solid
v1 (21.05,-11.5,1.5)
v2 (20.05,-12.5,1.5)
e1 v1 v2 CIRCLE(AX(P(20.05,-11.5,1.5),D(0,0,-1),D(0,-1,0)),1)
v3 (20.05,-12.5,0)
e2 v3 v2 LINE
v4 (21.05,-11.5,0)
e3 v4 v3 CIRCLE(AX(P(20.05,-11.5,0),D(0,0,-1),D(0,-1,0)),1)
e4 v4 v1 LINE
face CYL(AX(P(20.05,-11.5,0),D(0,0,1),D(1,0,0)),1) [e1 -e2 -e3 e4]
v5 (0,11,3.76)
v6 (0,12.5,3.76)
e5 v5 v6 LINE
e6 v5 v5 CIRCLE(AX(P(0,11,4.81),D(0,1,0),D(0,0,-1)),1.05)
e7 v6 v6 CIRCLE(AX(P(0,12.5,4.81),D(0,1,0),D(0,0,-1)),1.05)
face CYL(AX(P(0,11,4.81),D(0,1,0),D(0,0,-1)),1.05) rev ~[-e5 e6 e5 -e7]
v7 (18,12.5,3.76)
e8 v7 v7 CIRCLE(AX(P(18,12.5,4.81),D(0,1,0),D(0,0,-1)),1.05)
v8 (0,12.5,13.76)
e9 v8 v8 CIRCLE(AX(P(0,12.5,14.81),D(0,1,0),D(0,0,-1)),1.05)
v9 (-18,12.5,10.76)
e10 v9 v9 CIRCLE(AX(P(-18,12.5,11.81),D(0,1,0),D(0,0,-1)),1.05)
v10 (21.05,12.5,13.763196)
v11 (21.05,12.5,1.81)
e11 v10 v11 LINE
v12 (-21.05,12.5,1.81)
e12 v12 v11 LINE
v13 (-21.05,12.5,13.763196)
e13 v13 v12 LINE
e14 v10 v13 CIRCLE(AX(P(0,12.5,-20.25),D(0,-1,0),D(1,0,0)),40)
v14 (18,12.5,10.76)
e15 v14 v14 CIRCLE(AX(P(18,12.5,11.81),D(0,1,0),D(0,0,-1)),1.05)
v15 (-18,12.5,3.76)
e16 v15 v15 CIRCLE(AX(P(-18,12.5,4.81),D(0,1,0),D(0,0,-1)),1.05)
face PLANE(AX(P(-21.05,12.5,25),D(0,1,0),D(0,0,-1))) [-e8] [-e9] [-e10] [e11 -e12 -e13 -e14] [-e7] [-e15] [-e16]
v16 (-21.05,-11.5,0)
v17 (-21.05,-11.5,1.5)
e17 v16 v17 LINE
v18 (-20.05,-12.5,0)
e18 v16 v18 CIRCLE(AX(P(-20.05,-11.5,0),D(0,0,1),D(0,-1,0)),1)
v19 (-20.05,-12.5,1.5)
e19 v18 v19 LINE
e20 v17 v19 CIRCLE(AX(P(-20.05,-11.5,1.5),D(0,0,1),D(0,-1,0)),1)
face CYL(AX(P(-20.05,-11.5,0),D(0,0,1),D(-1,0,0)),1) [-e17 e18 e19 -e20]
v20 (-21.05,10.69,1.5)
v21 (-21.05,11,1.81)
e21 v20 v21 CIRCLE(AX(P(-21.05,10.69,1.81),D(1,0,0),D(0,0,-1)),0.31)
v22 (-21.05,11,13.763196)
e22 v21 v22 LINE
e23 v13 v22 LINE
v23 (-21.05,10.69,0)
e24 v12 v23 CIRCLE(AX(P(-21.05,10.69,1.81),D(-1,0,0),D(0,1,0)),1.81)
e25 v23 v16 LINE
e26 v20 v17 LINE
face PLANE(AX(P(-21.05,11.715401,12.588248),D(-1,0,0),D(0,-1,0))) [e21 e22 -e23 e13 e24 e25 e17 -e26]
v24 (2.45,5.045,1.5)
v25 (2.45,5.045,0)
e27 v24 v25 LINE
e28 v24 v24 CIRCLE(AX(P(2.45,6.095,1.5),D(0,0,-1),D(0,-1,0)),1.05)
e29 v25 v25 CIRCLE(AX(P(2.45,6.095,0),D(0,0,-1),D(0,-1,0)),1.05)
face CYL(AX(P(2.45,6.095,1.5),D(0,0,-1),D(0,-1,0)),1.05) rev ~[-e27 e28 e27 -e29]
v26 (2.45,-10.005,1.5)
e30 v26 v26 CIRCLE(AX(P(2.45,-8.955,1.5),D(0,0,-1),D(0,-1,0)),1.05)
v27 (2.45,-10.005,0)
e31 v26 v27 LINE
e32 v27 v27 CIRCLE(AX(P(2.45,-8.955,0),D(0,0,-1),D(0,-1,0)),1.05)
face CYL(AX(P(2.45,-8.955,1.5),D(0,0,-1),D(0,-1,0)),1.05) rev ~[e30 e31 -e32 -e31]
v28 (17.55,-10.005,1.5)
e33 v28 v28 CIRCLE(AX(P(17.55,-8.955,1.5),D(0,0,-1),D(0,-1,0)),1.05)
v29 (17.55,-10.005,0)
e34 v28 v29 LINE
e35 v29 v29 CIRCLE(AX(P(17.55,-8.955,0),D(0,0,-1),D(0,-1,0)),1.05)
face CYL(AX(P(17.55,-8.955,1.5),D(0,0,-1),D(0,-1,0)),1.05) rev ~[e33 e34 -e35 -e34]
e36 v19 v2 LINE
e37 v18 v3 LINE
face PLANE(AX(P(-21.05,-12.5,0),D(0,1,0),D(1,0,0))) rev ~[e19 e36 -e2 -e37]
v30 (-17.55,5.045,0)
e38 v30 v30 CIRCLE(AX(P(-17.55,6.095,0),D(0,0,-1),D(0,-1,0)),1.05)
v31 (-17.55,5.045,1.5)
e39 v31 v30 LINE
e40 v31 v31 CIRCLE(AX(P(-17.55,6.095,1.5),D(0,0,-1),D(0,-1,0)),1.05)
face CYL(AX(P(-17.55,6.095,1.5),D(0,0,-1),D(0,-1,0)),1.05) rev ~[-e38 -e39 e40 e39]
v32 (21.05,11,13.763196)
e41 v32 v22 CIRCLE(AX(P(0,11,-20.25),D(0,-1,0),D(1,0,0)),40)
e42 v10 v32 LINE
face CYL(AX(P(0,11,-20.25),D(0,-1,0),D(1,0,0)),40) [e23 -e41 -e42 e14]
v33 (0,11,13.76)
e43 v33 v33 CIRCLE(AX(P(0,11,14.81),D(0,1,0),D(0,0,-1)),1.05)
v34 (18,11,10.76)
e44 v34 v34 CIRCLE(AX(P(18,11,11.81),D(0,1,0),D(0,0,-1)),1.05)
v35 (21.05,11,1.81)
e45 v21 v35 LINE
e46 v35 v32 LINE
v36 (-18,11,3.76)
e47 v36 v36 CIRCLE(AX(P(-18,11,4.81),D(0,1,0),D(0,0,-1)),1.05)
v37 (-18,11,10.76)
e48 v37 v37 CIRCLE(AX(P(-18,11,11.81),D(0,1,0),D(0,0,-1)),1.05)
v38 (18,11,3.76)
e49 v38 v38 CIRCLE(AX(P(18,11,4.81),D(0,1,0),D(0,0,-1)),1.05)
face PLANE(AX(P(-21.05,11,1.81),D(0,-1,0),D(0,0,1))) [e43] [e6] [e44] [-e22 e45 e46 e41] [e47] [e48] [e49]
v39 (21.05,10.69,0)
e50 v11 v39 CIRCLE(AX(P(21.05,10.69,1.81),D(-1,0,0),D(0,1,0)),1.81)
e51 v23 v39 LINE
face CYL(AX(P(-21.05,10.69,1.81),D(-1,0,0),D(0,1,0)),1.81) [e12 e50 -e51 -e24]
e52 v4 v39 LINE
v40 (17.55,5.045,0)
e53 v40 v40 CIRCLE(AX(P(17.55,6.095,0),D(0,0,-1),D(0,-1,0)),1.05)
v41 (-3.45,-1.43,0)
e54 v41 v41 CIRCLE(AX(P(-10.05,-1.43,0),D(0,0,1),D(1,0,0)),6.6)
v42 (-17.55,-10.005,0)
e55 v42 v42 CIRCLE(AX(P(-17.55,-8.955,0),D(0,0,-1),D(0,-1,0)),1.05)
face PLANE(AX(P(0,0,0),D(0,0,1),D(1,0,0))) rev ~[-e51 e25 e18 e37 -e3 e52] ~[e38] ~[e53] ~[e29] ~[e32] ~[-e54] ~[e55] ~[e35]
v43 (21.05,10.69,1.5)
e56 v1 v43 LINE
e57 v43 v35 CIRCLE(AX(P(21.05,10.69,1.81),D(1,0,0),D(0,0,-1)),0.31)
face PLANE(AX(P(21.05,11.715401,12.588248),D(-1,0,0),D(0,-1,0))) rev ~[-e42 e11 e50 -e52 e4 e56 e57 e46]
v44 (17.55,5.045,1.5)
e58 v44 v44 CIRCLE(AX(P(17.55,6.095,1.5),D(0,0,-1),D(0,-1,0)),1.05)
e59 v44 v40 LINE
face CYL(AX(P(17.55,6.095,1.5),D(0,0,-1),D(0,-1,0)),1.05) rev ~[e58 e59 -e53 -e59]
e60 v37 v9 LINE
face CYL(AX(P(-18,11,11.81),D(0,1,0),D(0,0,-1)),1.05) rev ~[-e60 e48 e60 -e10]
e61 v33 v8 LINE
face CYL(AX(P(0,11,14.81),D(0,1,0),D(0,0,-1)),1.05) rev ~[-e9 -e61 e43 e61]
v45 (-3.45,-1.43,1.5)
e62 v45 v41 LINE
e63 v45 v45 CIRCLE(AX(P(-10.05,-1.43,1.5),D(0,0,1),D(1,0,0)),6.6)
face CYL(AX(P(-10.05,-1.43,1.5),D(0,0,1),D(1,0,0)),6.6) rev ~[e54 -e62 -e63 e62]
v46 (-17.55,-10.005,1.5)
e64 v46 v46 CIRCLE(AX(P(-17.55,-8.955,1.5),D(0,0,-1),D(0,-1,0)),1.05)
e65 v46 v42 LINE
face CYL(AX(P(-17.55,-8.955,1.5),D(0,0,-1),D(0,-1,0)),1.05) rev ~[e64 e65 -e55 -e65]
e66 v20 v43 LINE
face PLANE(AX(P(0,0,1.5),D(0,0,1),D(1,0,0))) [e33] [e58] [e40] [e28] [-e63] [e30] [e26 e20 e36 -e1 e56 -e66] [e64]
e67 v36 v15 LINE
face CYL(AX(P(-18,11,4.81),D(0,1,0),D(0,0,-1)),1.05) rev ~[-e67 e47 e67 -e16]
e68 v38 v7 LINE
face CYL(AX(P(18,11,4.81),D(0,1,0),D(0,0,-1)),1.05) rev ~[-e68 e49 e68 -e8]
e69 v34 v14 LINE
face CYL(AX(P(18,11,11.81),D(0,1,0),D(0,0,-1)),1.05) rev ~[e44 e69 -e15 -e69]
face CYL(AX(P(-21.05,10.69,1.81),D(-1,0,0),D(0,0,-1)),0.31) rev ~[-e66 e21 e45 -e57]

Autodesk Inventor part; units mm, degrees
ref_plane "YZ Plane" through (0, 0, 0) normal (1, 0, 0) x (0, 1, 0)
ref_plane "XZ Plane" through (0, 0, 0) normal (0, 1, 0) x (-1, 0, 0)
ref_plane "XY Plane" through (0, 0, 0) normal (0, 0, 1) x (1, 0, 0)
sketch "Sketch1" plane through (0, 0, 0) normal (0, 0, 1) x (1, 0, 0)
  line L0 (-21.05, -12.5) -> (21.05, -12.5)
  line L1 (21.05, -12.5) -> (21.05, 12.5)
  line L2 (21.05, 12.5) -> (-21.05, 12.5)
  line L3 (-21.05, 12.5) -> (-21.05, -12.5)
  line L4 (-21.05, -12.5) -> (21.05, 12.5) construction
  line L5 (21.05, -12.5) -> (-21.05, 12.5) construction
  point P0 (0, 0)
  dimension "d0" = 42.1
  dimension "d1" = 25
extrude "Plate1" add sketch "Sketch1" along normal blind 1.5
sketch "Sketch4" plane through (-21.05, 11, 0) normal (0, 1, 0) x (-1, 0, 0)
  line L0 (-42.1, 0) -> (0, 0)
  line L1 (0, 0) -> (0, 25)
  line L2 (0, 25) -> (-42.1, 25)
  line L3 (-42.1, 25) -> (-42.1, 0)
edge flange "Flange1" height 25 angle 90 thickness 1.5 bend radius 0.31 thickness toward (0, 1, 0) relief tear relief width 1.5 relief depth 0.75 edges at (0, 12.5, 1.5) wall of the first edge with corners at (21.05, 11, 0) (-21.05, 11, 0) (-21.05, 11, 25) (21.05, 11, 25)
bend "Bend1"
corner "Corner1"
sketch "Sketch5" plane through (-21.05, 11, 25) normal (0, -1, 0) x (1, 0, 0)
  circle A0 centre (21.05, -45.25) radius 40 projected
  circle A1 centre (21.05, -45.25) radius 53
  point P0 (21.05, -25)
  dimension "d23" = 13
extrude "Cut1" cut sketch "Sketch5" against normal blind 1.5
fillet "Corner Round1" radius 1 2 edges at (21.05, -12.5, 0.75) (-21.05, -12.5, 0.75)
sketch "Sketch6" plane through (-21.05, 11, 1.81) normal (0, -1, 0) x (1, 0, 0)
  line L0 (0, 0) -> (42.1, 0) projected
  arc A0 (42.1, 11.9532) -> (0, 11.9532) centre (21.05, -22.06) ccw projected
  line L1 (21.05, 0) -> (21.05, 17.94) construction
  point P0 (21.05, -1.81)
  point P1 (3.05, 3)
  point P2 (3.05, 10)
  point P3 (21.05, 13)
  point P4 (21.05, 3)
  point P5 (39.05, 3)
  point P6 (39.05, 10)
  dimension "d27" = 10
  dimension "d28" = 3
  dimension "d29" = 18
  dimension "d30" = 7
hole "Hole2" at (-18, 11, 4.81) at (-18, 11, 11.81) at (0, 11, 14.81) at (0, 11, 4.81) at (18, 11, 4.81) at (18, 11, 11.81) direction (0, 1, 0) diameter 2.1 end through all
sketch "Sketch7" plane through (0, 0, 1.5) normal (0, 0, 1) x (1, 0, 0)
  circle A0 centre (17.55, -8.955) radius 0.7835 projected
  circle A1 centre (2.45, -8.955) radius 0.7835 projected
  circle A2 centre (2.45, 6.095) radius 0.7835 projected
  circle A3 centre (17.55, 6.095) radius 0.7835 projected
  circle A4 centre (-17.55, 6.095) radius 0.7835 projected
  circle A5 centre (-17.55, -8.955) radius 0.7835 projected
  point P0 (0, 0)
hole "Hole3" at (17.55, 6.095, 1.5) at (17.55, -8.955, 1.5) at (2.45, -8.955, 1.5) at (2.45, 6.095, 1.5) at (-17.55, 6.095, 1.5) at (-17.55, -8.955, 1.5) direction (0, 0, -1) diameter 2.1 end through all
sketch "Sketch8" plane through (0, 0, 1.5) normal (0, 0, 1) x (1, 0, 0)
  circle A0 centre (-10.05, -1.43) radius 2.925 projected
  circle A1 centre (-10.05, -1.43) radius 6.6
  point P0 (0, 0)
  dimension "d45" = 13.2
extrude "Cut2" cut sketch "Sketch8" against normal blind 1.5 contours A0 | A1
equation "\"d24\" = Thickness"
equation "\"d43\" = Thickness"
equation "\"d46\" = Thickness"
equation "\"d2\" = Thickness"
equation "\"d13\" = BendReliefWidth"
equation "\"d14\" = BendReliefDepth"
equation "\"d15\" = MinimumRemnant"
equation "\"d16\" = TransitionRadius"
equation "\"d19\" = BendRadius"
equation "\"d20\" = CornerReliefSize"
equation "\"d21\" = GapSize"
equation "\"d22\" = JacobiRadiusSize"
equation "\"BendReliefWidth\" = Thickness"
equation "\"BendReliefDepth\" = 0.5 * Thickness"
equation "\"CornerReliefSize\" = 4 * Thickness"
equation "\"MinimumRemnant\" = 2 * Thickness"
equation "\"TransitionRadius\" = BendRadius"
equation "\"JacobiRadiusSize\" = BendRadius"
equation "\"GapSize\" = Thickness"
equation "\"Thickness\" = 1.5"
equation "\"BendRadius\" = 0.31"
properties part number "axis_2_bottom_L_frame(bottom)" material "Aluminum 6061-AHC"
